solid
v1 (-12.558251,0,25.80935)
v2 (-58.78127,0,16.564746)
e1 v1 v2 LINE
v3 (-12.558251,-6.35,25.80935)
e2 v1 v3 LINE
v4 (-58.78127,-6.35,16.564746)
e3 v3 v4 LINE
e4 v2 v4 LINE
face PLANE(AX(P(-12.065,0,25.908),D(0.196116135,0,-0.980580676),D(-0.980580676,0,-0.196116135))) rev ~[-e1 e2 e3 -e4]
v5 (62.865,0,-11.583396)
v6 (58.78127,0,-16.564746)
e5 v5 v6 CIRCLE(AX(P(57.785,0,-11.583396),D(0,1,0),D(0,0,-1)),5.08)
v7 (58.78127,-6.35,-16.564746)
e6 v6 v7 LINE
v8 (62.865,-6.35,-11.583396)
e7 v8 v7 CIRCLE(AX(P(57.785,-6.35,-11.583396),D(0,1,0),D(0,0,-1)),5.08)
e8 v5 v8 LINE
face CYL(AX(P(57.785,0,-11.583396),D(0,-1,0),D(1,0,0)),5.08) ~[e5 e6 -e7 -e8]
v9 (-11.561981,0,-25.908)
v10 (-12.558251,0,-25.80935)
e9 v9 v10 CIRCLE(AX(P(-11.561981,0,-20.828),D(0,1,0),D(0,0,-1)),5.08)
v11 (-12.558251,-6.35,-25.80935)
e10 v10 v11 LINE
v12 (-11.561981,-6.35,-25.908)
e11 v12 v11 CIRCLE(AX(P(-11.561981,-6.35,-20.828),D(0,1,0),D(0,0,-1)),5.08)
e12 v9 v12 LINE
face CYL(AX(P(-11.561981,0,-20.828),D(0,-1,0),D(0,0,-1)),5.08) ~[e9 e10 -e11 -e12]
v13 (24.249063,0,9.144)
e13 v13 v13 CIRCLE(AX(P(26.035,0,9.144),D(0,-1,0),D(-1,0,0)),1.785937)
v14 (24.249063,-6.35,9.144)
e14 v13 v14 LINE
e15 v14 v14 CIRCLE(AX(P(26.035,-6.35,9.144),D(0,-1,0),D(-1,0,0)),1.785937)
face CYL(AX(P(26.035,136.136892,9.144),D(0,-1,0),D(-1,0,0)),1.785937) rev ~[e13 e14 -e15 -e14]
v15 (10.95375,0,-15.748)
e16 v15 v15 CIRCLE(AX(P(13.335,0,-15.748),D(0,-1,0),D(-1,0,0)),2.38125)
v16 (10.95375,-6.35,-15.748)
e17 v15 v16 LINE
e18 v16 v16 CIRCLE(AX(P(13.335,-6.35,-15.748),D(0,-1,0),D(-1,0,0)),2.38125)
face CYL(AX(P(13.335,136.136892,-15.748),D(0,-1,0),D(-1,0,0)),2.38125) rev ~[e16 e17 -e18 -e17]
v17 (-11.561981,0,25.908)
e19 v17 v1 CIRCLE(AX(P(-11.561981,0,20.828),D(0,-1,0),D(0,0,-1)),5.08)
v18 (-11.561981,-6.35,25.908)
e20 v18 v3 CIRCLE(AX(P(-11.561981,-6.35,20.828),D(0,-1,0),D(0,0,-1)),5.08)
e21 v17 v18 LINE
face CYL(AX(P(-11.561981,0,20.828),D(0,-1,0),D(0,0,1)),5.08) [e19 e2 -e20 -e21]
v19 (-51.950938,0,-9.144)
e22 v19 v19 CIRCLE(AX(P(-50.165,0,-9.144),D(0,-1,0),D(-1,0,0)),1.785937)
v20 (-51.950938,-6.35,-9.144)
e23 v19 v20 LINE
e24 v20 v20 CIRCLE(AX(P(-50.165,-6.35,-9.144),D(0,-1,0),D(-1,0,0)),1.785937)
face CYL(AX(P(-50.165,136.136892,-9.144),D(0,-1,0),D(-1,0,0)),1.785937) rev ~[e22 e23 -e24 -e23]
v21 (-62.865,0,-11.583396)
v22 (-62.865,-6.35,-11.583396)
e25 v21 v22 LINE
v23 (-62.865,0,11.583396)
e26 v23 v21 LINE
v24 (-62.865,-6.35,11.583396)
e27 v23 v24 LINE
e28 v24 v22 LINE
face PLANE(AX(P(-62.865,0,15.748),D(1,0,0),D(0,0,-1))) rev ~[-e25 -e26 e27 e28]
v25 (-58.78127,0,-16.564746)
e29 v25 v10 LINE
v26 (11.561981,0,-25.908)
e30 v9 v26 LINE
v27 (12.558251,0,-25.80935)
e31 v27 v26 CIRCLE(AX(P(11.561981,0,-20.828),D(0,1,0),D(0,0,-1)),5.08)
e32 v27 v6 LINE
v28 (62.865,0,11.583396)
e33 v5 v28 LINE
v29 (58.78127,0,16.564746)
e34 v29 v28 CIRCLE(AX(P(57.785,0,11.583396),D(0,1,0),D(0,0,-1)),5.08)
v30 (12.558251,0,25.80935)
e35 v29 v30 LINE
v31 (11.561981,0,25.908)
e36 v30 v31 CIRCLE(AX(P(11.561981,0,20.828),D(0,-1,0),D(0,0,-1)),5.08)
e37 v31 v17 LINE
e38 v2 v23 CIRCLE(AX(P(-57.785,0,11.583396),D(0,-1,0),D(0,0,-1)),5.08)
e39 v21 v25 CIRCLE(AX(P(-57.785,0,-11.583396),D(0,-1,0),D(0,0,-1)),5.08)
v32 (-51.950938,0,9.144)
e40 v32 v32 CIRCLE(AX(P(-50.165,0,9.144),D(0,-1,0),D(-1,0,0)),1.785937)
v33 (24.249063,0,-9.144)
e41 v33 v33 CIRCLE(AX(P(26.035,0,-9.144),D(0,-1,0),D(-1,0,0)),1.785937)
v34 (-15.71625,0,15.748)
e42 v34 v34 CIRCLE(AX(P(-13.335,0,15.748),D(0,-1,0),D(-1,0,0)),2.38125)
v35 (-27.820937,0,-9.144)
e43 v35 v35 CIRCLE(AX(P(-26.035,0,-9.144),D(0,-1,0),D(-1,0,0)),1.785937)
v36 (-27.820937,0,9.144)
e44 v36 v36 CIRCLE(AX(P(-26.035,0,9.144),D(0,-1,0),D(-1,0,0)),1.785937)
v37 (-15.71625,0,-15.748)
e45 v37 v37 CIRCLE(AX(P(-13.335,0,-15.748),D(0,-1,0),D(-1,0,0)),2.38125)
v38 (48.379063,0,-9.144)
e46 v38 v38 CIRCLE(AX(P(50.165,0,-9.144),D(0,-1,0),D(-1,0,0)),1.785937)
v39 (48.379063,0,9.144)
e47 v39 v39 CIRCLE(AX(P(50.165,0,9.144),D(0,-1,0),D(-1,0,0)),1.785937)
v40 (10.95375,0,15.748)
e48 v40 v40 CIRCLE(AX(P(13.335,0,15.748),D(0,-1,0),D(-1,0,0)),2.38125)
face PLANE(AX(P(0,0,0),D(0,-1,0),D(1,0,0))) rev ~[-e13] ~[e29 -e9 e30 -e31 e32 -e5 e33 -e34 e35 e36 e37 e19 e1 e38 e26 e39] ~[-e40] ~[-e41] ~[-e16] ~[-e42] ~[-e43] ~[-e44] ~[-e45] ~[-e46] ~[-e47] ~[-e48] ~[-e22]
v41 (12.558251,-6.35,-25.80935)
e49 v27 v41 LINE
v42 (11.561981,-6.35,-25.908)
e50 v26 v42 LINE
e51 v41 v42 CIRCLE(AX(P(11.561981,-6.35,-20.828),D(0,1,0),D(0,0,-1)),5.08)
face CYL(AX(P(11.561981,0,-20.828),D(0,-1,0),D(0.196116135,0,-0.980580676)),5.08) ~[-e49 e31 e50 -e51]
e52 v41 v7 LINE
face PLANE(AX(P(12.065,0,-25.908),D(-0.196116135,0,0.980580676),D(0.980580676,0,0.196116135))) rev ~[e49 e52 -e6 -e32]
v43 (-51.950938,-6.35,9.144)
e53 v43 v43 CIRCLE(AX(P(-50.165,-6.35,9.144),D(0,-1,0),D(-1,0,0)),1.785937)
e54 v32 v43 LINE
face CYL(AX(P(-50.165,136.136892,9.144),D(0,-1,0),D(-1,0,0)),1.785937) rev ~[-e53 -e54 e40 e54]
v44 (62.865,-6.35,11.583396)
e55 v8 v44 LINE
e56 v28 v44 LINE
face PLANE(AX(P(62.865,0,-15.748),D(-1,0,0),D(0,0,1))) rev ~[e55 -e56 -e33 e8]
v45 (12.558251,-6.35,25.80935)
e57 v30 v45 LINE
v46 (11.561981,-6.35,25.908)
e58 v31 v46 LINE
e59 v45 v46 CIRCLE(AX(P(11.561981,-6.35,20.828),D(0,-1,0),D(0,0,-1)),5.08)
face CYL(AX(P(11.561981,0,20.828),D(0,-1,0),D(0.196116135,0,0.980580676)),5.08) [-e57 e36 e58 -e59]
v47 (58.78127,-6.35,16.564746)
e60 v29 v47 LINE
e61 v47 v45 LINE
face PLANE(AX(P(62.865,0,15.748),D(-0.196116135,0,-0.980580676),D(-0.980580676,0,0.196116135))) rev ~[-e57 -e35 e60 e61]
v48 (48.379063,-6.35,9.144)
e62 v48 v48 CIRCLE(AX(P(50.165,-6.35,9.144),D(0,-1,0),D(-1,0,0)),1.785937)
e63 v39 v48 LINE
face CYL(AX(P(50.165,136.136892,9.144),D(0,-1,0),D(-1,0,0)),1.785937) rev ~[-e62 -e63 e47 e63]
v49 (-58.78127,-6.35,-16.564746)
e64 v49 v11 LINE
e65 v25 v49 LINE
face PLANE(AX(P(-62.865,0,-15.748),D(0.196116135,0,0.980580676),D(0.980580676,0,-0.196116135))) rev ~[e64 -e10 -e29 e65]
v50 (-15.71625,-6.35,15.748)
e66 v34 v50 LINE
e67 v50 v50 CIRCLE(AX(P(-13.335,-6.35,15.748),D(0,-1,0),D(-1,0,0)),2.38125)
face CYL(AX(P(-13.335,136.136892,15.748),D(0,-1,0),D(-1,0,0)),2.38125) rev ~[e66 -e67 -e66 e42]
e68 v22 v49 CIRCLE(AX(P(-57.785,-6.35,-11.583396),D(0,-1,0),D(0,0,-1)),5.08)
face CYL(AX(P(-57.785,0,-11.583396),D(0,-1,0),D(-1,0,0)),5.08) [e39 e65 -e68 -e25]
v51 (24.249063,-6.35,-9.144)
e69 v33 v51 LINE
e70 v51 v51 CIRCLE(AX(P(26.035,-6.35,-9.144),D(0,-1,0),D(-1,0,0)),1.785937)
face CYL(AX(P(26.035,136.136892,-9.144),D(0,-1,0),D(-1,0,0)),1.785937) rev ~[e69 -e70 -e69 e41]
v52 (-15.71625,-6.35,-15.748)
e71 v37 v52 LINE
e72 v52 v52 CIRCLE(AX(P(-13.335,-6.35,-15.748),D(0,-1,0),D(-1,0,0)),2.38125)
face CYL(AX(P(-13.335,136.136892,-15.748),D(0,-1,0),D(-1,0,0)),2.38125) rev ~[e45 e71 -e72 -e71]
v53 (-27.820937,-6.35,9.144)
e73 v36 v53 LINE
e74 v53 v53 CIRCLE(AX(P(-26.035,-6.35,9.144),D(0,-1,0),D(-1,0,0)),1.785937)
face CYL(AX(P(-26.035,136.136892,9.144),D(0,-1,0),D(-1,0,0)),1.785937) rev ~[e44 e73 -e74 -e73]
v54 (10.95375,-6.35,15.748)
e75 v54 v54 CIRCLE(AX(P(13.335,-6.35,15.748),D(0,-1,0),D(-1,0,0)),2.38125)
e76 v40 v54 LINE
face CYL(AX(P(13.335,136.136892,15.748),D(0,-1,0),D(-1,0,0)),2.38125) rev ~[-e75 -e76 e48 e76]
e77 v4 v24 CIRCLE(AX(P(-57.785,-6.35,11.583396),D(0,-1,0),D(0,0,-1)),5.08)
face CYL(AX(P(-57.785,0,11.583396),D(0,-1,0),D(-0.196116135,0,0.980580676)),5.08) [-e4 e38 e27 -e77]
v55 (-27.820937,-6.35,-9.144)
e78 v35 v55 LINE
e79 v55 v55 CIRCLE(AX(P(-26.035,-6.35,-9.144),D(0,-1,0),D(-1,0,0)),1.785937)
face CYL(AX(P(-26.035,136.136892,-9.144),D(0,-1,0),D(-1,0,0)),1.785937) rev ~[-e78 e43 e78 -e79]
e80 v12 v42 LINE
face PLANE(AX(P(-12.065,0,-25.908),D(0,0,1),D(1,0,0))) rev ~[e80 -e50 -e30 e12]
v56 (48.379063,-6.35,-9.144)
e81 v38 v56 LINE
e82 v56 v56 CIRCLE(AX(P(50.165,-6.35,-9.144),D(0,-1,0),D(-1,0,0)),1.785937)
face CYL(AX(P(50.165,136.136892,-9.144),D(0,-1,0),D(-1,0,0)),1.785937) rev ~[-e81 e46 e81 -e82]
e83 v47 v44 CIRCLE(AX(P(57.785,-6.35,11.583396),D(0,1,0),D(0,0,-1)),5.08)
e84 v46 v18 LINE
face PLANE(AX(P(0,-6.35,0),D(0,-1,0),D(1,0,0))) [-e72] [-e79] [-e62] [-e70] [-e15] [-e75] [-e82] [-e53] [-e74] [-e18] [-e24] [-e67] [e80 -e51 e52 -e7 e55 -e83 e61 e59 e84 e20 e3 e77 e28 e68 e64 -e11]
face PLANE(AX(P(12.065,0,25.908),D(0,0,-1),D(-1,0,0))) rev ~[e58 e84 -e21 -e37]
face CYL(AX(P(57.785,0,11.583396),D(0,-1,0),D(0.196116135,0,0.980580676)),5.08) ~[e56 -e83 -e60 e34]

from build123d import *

# Parameters (mm, degrees)
F1_DEPTH = 6.35
F2_D     = 4.7625
F3_D     = 3.571875
F4_R     = 5.08


with BuildPart() as f1:
    # F0 (on Front) → F1 (new body)
    with BuildSketch(Plane.XZ):
        Polygon((62.865, 15.748), (12.065, 25.908), (-12.065, 25.908), (-62.865, 15.748), (-62.865, -15.748), (-12.065, -25.908), (12.065, -25.908), (62.865, -15.748), align=None)
    extrude(amount=F1_DEPTH)

    # F2 (through all)
    with Locations(Plane(origin=(0, 0, 0), x_dir=(1, 0, 0), z_dir=(0, 1, 0))):
        with Locations((-13.335, -15.748), (13.335, -15.748), (13.335, 15.748), (-13.335, 15.748)):
            Hole(F2_D / 2)

    # F3 (through all)
    with Locations(Plane(origin=(0, 0, 0), x_dir=(1, 0, 0), z_dir=(0, 1, 0))):
        with Locations((26.035, -9.144), (50.165, -9.144), (50.165, 9.144), (26.035, 9.144), (-26.035, 9.144), (-26.035, -9.144), (-50.165, -9.144), (-50.165, 9.144)):
            Hole(F3_D / 2)

    # F4
    f4_edges = [f1.edges().sort_by_distance(p)[0] for p in [
        (-62.865, -3.175, 15.748),
        (62.865, -3.175, -15.748),
        (-62.865, -3.175, -15.748),
        (62.865, -3.175, 15.748),
        (12.065, -3.175, -25.908),
        (12.065, -3.175, 25.908),
        (-12.065, -3.175, -25.908),
        (-12.065, -3.175, 25.908),
    ]]
    fillet(f4_edges, radius=F4_R)


solid = f1.part
